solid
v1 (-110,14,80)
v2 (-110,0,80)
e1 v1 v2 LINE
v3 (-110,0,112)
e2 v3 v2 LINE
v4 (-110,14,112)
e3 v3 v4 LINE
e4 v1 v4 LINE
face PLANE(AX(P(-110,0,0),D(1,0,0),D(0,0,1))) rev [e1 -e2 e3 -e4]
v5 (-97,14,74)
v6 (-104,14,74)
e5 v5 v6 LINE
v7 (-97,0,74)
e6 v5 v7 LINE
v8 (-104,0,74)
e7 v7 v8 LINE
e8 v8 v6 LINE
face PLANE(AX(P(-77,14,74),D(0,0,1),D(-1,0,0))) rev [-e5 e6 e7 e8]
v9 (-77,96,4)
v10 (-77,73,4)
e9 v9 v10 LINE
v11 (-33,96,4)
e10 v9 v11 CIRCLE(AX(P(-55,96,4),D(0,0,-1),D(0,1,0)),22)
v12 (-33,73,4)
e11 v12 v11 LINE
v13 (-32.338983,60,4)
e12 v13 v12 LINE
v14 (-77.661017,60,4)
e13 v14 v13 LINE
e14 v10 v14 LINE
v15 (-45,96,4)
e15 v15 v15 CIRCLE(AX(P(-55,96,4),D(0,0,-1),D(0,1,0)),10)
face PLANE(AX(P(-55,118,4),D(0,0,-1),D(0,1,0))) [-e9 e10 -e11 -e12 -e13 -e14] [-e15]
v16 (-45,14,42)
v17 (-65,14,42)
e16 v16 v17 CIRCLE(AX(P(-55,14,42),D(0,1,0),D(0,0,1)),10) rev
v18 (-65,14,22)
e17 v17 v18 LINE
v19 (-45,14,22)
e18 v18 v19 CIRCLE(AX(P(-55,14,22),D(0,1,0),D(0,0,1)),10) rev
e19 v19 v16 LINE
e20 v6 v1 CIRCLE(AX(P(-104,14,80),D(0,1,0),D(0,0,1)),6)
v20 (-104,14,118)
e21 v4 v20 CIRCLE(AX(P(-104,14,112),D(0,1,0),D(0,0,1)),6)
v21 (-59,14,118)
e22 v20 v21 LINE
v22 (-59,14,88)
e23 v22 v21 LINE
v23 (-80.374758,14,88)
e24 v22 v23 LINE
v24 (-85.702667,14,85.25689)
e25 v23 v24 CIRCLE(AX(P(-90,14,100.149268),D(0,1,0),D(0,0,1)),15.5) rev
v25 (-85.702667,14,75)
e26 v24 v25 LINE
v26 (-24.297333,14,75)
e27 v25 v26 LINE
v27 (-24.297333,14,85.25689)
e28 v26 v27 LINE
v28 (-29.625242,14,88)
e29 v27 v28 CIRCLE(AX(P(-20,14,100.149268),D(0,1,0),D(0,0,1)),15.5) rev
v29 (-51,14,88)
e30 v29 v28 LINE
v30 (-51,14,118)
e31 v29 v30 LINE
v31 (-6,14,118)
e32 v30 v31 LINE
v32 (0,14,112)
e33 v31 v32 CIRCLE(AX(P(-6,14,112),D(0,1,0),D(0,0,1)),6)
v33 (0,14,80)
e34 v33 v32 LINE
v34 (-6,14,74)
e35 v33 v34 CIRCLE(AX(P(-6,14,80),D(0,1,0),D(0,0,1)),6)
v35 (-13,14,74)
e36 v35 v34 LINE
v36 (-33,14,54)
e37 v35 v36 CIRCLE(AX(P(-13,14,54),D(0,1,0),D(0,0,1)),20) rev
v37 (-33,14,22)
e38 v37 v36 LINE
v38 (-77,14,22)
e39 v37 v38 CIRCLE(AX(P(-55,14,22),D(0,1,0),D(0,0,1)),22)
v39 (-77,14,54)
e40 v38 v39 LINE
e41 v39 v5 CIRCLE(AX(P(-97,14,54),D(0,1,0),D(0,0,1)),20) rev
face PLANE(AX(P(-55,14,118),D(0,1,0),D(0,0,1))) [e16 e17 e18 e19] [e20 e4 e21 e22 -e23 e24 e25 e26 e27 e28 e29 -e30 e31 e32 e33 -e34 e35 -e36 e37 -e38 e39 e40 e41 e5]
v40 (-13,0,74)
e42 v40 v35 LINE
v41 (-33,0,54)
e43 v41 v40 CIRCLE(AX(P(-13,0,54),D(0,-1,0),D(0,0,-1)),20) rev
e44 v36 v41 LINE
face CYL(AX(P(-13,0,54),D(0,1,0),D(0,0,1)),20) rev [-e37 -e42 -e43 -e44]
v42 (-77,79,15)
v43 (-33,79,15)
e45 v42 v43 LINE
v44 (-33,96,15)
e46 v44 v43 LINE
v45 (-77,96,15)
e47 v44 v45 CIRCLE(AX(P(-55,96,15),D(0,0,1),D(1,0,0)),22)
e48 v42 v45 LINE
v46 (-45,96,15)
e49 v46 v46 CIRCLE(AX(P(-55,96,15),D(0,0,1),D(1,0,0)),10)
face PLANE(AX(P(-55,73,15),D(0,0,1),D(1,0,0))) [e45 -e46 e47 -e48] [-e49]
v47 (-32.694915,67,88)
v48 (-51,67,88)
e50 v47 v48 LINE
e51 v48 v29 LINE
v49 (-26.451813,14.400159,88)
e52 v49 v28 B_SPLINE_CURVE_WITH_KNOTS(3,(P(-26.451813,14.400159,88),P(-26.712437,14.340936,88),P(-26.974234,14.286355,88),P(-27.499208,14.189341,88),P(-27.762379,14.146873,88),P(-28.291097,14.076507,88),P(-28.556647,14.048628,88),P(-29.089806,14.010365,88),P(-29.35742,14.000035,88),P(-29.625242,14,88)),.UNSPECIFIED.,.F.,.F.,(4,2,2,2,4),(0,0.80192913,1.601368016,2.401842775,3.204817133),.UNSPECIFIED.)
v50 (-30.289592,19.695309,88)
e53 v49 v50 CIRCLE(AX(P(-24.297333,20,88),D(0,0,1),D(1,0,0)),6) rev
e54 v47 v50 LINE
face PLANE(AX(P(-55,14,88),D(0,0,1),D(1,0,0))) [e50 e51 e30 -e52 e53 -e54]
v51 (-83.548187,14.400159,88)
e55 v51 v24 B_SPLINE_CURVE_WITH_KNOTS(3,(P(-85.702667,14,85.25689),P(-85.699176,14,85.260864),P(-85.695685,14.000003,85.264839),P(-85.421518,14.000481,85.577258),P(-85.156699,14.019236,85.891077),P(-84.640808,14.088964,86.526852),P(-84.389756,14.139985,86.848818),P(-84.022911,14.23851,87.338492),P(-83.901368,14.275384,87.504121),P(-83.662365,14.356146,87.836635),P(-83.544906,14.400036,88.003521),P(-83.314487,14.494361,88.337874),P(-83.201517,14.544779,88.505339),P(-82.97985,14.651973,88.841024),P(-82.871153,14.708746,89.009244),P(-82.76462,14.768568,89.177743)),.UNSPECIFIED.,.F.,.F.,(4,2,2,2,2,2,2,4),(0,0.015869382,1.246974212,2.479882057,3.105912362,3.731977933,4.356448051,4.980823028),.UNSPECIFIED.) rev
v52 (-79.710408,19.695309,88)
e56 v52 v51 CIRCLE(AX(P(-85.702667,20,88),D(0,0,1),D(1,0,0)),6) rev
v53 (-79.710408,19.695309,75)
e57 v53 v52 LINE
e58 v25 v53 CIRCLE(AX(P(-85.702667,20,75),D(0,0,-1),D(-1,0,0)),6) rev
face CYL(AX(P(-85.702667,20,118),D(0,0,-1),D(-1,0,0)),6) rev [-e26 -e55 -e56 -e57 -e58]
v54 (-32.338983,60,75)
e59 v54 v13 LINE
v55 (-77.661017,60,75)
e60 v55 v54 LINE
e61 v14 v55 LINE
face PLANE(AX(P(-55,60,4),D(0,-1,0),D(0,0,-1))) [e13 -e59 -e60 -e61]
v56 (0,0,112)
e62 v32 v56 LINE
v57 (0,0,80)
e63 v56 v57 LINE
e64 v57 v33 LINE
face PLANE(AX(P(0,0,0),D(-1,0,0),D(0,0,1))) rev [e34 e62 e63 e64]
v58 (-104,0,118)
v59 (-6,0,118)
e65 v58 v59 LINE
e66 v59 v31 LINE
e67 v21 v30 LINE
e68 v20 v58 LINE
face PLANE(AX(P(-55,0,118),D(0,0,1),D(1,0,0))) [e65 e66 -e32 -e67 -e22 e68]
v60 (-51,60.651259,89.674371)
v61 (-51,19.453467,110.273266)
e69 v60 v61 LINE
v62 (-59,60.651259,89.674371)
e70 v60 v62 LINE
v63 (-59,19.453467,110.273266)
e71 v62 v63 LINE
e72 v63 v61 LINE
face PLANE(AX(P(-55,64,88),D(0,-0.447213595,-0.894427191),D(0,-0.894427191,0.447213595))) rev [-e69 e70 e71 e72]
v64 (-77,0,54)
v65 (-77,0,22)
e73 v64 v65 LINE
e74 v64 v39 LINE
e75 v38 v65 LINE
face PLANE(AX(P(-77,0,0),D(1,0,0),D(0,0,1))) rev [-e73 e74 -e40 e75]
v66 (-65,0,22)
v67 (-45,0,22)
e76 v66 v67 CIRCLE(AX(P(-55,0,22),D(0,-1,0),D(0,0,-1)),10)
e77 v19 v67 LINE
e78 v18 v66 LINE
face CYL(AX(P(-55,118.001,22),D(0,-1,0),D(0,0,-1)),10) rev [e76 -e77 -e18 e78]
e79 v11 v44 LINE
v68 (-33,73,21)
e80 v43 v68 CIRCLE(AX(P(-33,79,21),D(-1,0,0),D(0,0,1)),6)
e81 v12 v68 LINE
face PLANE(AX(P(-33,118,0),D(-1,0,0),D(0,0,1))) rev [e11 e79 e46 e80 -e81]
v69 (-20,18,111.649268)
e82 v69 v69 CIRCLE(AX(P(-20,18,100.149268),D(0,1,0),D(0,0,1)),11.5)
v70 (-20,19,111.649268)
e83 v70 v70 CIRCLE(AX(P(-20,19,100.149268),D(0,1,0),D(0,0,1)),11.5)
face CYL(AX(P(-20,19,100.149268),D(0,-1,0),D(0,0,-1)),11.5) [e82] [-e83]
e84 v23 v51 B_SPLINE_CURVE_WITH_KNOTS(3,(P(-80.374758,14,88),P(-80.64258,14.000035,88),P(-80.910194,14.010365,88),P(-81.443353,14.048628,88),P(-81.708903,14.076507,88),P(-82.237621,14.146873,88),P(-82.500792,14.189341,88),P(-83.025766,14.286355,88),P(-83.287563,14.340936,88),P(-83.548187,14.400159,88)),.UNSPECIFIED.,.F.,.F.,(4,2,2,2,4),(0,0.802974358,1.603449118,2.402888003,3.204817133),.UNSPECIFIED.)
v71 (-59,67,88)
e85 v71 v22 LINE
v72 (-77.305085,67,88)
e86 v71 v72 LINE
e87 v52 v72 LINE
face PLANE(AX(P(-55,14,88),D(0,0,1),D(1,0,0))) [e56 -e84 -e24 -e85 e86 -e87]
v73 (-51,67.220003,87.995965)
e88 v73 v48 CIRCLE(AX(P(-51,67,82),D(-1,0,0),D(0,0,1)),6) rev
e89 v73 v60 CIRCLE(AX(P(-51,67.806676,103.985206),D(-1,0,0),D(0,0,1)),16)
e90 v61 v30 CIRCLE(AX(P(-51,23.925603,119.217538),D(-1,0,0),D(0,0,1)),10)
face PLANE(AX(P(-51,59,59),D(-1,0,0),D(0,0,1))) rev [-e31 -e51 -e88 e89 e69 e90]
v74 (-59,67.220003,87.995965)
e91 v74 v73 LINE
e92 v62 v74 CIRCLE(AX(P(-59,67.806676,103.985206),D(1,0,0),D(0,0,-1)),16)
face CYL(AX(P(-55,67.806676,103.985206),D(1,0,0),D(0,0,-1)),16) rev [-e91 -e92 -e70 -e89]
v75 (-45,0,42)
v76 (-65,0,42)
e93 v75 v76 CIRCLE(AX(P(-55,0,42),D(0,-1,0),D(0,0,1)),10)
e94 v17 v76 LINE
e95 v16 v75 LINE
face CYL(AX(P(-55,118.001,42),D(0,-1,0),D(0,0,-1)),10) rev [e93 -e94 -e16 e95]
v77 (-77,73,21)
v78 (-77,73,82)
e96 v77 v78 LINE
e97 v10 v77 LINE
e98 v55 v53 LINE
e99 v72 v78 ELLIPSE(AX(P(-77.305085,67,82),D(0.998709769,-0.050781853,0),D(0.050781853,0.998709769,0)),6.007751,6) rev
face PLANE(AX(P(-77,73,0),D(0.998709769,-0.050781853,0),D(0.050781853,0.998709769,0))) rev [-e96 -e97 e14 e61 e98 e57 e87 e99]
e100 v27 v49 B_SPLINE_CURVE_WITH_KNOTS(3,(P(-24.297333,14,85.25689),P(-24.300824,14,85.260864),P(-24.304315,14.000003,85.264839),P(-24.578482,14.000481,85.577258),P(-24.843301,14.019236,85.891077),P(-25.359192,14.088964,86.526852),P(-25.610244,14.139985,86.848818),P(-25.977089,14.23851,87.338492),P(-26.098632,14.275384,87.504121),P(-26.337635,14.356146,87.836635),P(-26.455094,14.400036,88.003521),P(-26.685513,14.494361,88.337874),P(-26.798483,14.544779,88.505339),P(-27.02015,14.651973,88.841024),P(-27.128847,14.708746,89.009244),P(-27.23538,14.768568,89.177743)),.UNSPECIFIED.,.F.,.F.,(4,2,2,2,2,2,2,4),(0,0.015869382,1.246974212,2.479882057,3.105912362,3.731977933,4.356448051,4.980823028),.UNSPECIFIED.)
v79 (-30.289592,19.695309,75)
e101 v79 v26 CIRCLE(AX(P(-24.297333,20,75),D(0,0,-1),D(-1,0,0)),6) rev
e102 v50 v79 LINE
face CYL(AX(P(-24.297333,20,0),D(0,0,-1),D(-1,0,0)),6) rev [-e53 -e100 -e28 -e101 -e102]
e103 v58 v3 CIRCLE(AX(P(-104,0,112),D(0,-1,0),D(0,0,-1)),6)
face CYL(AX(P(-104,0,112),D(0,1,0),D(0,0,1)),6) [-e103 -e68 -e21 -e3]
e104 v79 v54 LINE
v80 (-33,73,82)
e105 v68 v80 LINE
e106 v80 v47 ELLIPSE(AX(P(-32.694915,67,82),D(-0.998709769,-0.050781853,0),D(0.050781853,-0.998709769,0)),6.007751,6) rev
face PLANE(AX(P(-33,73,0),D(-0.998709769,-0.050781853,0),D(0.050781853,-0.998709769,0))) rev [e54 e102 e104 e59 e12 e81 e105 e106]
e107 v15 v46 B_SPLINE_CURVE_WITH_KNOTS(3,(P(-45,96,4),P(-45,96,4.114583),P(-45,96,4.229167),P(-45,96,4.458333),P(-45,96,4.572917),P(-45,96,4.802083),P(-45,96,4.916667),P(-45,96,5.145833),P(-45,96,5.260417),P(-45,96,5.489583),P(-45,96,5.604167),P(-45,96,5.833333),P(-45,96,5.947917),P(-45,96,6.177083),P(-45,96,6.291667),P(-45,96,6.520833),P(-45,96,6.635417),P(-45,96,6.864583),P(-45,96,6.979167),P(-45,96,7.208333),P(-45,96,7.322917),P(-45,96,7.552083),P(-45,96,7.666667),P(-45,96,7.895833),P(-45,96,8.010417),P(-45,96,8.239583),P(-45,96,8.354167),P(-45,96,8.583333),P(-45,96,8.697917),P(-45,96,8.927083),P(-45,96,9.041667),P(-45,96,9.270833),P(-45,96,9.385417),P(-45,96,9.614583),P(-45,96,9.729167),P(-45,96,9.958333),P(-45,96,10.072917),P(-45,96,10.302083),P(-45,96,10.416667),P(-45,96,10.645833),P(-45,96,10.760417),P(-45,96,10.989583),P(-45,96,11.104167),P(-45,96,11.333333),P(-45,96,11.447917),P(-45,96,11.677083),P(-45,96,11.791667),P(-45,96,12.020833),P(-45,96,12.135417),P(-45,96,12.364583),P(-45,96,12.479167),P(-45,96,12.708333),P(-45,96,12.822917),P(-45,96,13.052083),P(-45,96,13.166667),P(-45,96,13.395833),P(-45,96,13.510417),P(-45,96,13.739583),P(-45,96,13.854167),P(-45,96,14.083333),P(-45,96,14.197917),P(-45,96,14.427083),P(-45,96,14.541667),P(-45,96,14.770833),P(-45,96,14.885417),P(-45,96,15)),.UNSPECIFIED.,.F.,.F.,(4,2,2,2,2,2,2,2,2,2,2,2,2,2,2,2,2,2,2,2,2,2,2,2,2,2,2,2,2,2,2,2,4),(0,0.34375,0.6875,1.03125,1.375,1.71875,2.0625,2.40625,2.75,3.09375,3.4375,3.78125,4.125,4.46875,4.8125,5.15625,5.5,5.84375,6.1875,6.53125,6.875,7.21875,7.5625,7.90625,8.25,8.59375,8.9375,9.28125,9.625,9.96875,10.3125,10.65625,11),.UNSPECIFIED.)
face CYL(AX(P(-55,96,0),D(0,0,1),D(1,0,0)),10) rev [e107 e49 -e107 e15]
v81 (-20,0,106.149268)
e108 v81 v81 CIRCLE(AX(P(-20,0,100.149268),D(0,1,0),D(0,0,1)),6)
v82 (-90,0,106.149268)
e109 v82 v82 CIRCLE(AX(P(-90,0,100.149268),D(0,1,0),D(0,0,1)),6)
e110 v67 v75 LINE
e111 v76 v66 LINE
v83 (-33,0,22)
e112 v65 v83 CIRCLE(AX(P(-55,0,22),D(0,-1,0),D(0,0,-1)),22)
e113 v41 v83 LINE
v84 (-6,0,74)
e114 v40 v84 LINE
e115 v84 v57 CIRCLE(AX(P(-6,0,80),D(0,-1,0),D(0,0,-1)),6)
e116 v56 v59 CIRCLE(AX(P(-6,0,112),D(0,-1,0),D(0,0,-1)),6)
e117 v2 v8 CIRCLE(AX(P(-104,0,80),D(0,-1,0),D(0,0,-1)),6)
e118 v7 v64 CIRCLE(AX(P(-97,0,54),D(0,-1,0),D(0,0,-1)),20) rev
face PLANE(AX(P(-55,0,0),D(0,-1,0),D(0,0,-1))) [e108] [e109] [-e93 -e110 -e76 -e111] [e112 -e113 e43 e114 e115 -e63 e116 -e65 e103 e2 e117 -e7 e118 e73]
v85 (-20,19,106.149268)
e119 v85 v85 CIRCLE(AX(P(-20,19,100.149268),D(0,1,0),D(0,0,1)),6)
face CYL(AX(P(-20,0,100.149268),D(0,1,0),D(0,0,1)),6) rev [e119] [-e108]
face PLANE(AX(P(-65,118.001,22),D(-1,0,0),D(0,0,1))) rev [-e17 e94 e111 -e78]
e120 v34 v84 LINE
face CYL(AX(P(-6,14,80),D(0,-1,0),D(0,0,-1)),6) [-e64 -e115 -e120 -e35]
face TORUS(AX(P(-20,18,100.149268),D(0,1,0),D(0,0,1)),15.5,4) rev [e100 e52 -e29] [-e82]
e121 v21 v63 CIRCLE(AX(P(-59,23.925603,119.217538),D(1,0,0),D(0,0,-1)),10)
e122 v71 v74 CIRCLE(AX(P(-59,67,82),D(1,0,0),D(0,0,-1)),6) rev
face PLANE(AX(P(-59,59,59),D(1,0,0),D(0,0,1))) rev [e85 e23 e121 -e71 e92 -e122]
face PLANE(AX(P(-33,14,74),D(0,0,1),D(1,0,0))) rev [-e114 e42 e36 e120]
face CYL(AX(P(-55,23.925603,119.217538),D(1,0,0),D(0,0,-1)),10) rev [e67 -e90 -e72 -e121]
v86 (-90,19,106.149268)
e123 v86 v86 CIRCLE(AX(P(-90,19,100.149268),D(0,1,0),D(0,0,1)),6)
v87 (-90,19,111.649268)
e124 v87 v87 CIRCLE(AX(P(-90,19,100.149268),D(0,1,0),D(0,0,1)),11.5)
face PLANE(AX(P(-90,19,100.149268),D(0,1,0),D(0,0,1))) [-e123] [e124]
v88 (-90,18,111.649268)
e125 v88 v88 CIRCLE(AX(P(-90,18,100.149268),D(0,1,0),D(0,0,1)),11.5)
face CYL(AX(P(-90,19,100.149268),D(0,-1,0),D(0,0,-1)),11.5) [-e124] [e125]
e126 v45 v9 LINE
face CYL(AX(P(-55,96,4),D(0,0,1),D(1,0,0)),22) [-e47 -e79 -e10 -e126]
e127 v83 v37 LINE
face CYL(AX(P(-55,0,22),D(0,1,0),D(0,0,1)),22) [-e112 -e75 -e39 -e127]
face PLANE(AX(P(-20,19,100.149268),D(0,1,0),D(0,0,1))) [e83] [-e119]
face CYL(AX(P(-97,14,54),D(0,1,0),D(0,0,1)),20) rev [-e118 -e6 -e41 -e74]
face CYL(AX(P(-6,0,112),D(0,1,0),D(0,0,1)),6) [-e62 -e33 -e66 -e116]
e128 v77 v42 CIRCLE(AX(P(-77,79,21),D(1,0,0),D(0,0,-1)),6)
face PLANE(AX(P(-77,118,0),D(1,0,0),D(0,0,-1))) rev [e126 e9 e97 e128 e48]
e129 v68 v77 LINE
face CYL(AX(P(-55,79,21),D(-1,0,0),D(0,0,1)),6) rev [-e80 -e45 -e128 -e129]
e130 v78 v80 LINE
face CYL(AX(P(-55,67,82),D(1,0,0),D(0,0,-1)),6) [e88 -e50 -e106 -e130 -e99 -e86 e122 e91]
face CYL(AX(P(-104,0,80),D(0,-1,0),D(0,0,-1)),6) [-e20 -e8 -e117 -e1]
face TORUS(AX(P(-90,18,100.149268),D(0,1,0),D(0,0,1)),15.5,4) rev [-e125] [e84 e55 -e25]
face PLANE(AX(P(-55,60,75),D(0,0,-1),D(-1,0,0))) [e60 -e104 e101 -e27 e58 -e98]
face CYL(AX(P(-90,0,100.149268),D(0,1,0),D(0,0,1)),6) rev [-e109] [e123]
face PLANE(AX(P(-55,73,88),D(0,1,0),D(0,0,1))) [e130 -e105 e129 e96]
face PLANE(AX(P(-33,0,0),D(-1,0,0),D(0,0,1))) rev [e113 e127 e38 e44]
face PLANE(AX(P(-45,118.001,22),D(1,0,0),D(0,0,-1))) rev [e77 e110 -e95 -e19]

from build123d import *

# Parameters (mm, degrees)
ESTRUSIONE_ESTRUSIONE2_DEPTH = 55
NERVATURA1_REACH             = 177.707
SCHIZZO2_WALL_W              = 409.315984862
SCHIZZO2_WALL_H              = 4
SCHIZZO3_W                   = 84
SCHIZZO3_H                   = 104
TAGLIO_ESTRUSIONE1_DEPTH     = 30
SCHIZZO4_W                   = 74
SCHIZZO4_H                   = 14
TAGLIO_ESTRUSIONE2_DEPTH     = 33
SPECCHIA2_START              = -77
SPECCHIA2_DEPTH              = 22
SPECCHIA2_START_2            = -110
SPECCHIA2_2_OUTLINE_W        = 14
SPECCHIA2_2_OUTLINE_H        = 44
SPECCHIA2_2_DEPTH            = 33
SPECCHIA2_START_3            = -80
SPECCHIA2_3_DEPTH            = 3
SPECCHIA2_START_4            = -59
SPECCHIA2_4_DEPTH            = 4
RACCORDO1_RADIUS             = 22
RACCORDO1_LENGTH             = 14
RACCORDO3_R                  = 20
RACCORDO4_R                  = 6
TAGLIO_ESTRUSIONE3_DEPTH     = 184.760713973
SCHIZZO7_W                   = 3
SCHIZZO7_H                   = 45
TAGLIO_ESTRUSIONE4_DEPTH     = 192.397492147
RACCORDO11_RADIUS            = 22
RACCORDO11_LENGTH            = 11
RACCORDO12_R                 = 6
RACCORDO13_R                 = 16
RACCORDO15_R                 = 10
SCHIZZO8_R                   = 10
TAGLIO_ESTRUSIONE5_DEPTH     = 192.397492147
SCHIZZO9_R                   = 11.5
ESTRUSIONE_ESTRUSIONE3_DEPTH = 5
SCHIZZO10_R                  = 6
TAGLIO_ESTRUSIONE6_DEPTH     = 190.274932307
TAGLIO_ESTRUSIONE7_REACH     = 201.87
RACCORDO17_R                 = 4
RACCORDO18_START             = 75
RACCORDO18_DEPTH             = 13


with BuildPart() as part:
    # Schizzo1 → Estrusione-Estrusione2 (new body)
    with BuildSketch(Plane(origin=(0, 0, 0), x_dir=(0, 0, -1), z_dir=(1, 0, 0))):
        Polygon((0, 0), (-118, 0), (-118, 14), (-88, 14), (-88, 73), (-15, 73), (-15, 118), (-4, 118), (-4, 60), (-75, 60), (-75, 14), (0, 14), align=None)
    extrude(amount=-ESTRUSIONE_ESTRUSIONE2_DEPTH)

    # Schizzo2 wall → Nervatura1 (add, up to next)
    with BuildSketch(Plane(origin=(-55, 39, 100.5), x_dir=(0, -0.894427191, 0.4472135955), z_dir=(0, 0.4472135955, 0.894427191)), mode=Mode.PRIVATE) as nervatura1_sk1:
        with Locations((0, 2)):
            Rectangle(SCHIZZO2_WALL_W, SCHIZZO2_WALL_H)
    nervatura1_tool1 = extrude(nervatura1_sk1.sketch, amount=-NERVATURA1_REACH, mode=Mode.PRIVATE) - part.part
    add(nervatura1_tool1.solids().sort_by_distance((-55, 39, 100.5))[0])

    # Schizzo3 → Taglio-Estrusione1 (cut)
    with BuildSketch(Plane(origin=(0, 0, 0), x_dir=(0, 0, -1), z_dir=(1, 0, 0))):
        with Locations((-46, 66)):
            Rectangle(SCHIZZO3_W, SCHIZZO3_H)
    extrude(amount=-TAGLIO_ESTRUSIONE1_DEPTH, mode=Mode.SUBTRACT)

    # Schizzo4 → Taglio-Estrusione2 (cut)
    with BuildSketch(Plane(origin=(0, 0, 0), x_dir=(0, 0, -1), z_dir=(1, 0, 0))):
        with Locations((-37, 7)):
            Rectangle(SCHIZZO4_W, SCHIZZO4_H)
    extrude(amount=-TAGLIO_ESTRUSIONE2_DEPTH, mode=Mode.SUBTRACT)

    # Specchia2: read off the stored shape, not the designer's step
    # Specchia2 outline → Specchia2 (add)
    with BuildSketch(Plane.YZ.offset(SPECCHIA2_START)):
        Polygon((0, 0), (14, 0), (14, 75), (60, 75), (60, 4), (118, 4), (118, 15), (73, 15), (73, 88), (14, 88), (14, 118), (0, 118), align=None)
    extrude(amount=SPECCHIA2_DEPTH)

    # Specchia2 2 outline → Specchia2 2 (add)
    with BuildSketch(Plane.YZ.offset(SPECCHIA2_START_2)):
        with Locations((7, 96)):
            Rectangle(SPECCHIA2_2_OUTLINE_W, SPECCHIA2_2_OUTLINE_H)
    extrude(amount=SPECCHIA2_2_DEPTH)

    # Specchia2 3 outline → Specchia2 3 (add)
    with BuildSketch(Plane.YZ.offset(SPECCHIA2_START_3)):
        Polygon((14, 88), (14, 75), (60, 75), (60, 4), (118, 4), (118, 15), (73, 15), (73, 88), align=None)
    extrude(amount=SPECCHIA2_3_DEPTH)

    # Specchia2 4 outline → Specchia2 4 (add)
    with BuildSketch(Plane.YZ.offset(SPECCHIA2_START_4)):
        Polygon((14, 113), (14, 88), (64, 88), align=None)
    extrude(amount=SPECCHIA2_4_DEPTH)

    # Raccordo1: full round fillet: the end face becomes a half cylinder, R = half its width
    raccordo1_face = Plane((-55, 7, 0), x_dir=(0, -1, 0), z_dir=(0, 0, -1))  # on the end face: x along it, z out of the body
    raccordo1_slab = raccordo1_face.offset(-RACCORDO1_RADIUS / 2) * Box(RACCORDO1_LENGTH, 2 * RACCORDO1_RADIUS, RACCORDO1_RADIUS, mode=Mode.PRIVATE)  # the body's end, R deep
    raccordo1_round = Plane((-55, 7, 22), x_dir=(0, 0, -1), z_dir=(0, -1, 0)) * Cylinder(RACCORDO1_RADIUS, RACCORDO1_LENGTH, mode=Mode.PRIVATE)  # its axis R under the face
    add(raccordo1_slab - raccordo1_round, mode=Mode.SUBTRACT)

    # Raccordo3
    raccordo3_edges = [part.edges().sort_by_distance(p)[0] for p in [
        (-33, 7, 74),
        (-77, 7, 74),
    ]]
    fillet(raccordo3_edges, radius=RACCORDO3_R)

    # Raccordo4
    raccordo4_edges = [part.edges().sort_by_distance(p)[0] for p in [
        (0, 7, 74),
        (-110, 7, 118),
        (0, 7, 118),
        (-110, 7, 74),
    ]]
    fillet(raccordo4_edges, radius=RACCORDO4_R)

    # Schizzo6 → Taglio-Estrusione3 (cut, through all)
    with BuildSketch(Plane.XY.offset(88)):
        Polygon((-33, 73), (-30, 14), (-30, 73), align=None)
        Polygon((-80, 14), (-80, 73), (-77, 73), align=None)
    extrude(amount=-TAGLIO_ESTRUSIONE3_DEPTH, mode=Mode.SUBTRACT)

    # Schizzo7 → Taglio-Estrusione4 (cut, through all)
    with BuildSketch(Plane.XY.offset(15)):
        with Locations((-31.5, 95.5)):
            Rectangle(SCHIZZO7_W, SCHIZZO7_H)
        with Locations((-78.5, 95.5)):
            Rectangle(SCHIZZO7_W, SCHIZZO7_H)
    extrude(amount=-TAGLIO_ESTRUSIONE4_DEPTH, mode=Mode.SUBTRACT)

    # Raccordo11: full round fillet: the end face becomes a half cylinder, R = half its width
    raccordo11_face = Plane((-55, 118, 9.5), x_dir=(0, 0, -1), z_dir=(0, 1, 0))  # on the end face: x along it, z out of the body
    raccordo11_slab = raccordo11_face.offset(-RACCORDO11_RADIUS / 2) * Box(RACCORDO11_LENGTH, 2 * RACCORDO11_RADIUS, RACCORDO11_RADIUS, mode=Mode.PRIVATE)  # the body's end, R deep
    raccordo11_round = Plane((-55, 96, 9.5), x_dir=(0, 1, 0), z_dir=(0, 0, -1)) * Cylinder(RACCORDO11_RADIUS, RACCORDO11_LENGTH, mode=Mode.PRIVATE)  # its axis R under the face
    add(raccordo11_slab - raccordo11_round, mode=Mode.SUBTRACT)

    # Raccordo12
    raccordo12_edges = [part.edges().sort_by_distance(p)[0] for p in [
        (-55, 73, 15),
        (-55, 73, 88),
    ]]
    fillet(raccordo12_edges, radius=RACCORDO12_R)

    # Raccordo13
    # the kernel refuses this fillet: 16 mm, written as the material it adds along each edge
    with BuildSketch(Plane(origin=(-59, 64, 88), x_dir=(7.107647619401389e-15, 0.9999992149494827, -0.0012530364791798036), z_dir=(1, 0, 0))) as raccordo13_piece_1:
        with BuildLine():
            CenterArc((3.78664302, 15.989963147), RACCORDO13_R, 243.506742544, 24.463710432)
            Line((-3.350836892, 1.670173327), (-4.064584883, 0.238194345))
            Line((-4.064584883, 0.238194345), (-0.713747991, -1.431978982))
            Line((-0.713747991, -1.431978982), (0.002004858, -1.599998744))
            ThreePointArc((0.002004858, -1.599998744), (3.002002503, -1.596239634), (3.163341295, -1.598996315))
            Line((3.163341295, -1.598996315), (3.220005088, 0))
        make_face()
    extrude(amount=8)

    # Raccordo15
    # the kernel refuses this fillet: 10 mm, written as the material it adds along each edge
    with BuildSketch(Plane(origin=(-51, 14, 113), x_dir=(0, 0, 1), z_dir=(-1, 0, 0))) as raccordo15_piece_1:
        with BuildLine():
            CenterArc((6.217538244, 9.925603288), RACCORDO15_R, 206.565051177, 56.441617235)
            Line((-2.726733666, 5.453467333), (-2.905619105, 5.364024614))
            Line((-2.905619105, 5.364024614), (-0.178885438, -0.089442719))
            Line((-0.178885438, -0.089442719), (0, -0.2))
            ThreePointArc((0, -0.2), (2.5, -0.2), (4.975649235, -0.198512066))
            Line((4.975649235, -0.198512066), (5, 0))
        make_face()
    extrude(amount=8)

    # Schizzo8 → Taglio-Estrusione5 (cut, through all)
    with BuildSketch(Plane.XY.offset(15)):
        with Locations((-55, 96)):
            Circle(SCHIZZO8_R)
    extrude(amount=-TAGLIO_ESTRUSIONE5_DEPTH, mode=Mode.SUBTRACT)

    # Schizzo9 → Estrusione-Estrusione3 (add)
    with BuildSketch(Plane(origin=(0, 14, 0), x_dir=(1, 0, 0), z_dir=(0, 1, 0))):
        with Locations(Location((-90, -100.149267902, 0), (0, 0, 270))):
            Circle(SCHIZZO9_R)
        with Locations(Location((-20, -100.149267902, 0), (0, 0, 270))):
            Circle(SCHIZZO9_R)
    extrude(amount=ESTRUSIONE_ESTRUSIONE3_DEPTH)

    # Schizzo10 → Taglio-Estrusione6 (cut, through all)
    with BuildSketch(Plane(origin=(0, 19, 0), x_dir=(1, 0, 0), z_dir=(0, 1, 0))):
        with Locations(Location((-90, -100.149267902, 0), (0, 0, 270))):
            Circle(SCHIZZO10_R)
        with Locations(Location((-20, -100.149267902, 0), (0, 0, 270))):
            Circle(SCHIZZO10_R)
    extrude(amount=-TAGLIO_ESTRUSIONE6_DEPTH, mode=Mode.SUBTRACT)

    # Schizzo11 → Taglio-Estrusione7 (cut, up to next)
    with BuildSketch(Plane.XZ, mode=Mode.PRIVATE) as taglio_estrusione7_sk1:
        with BuildLine():
            Line((-65, 22), (-65, 42))
            ThreePointArc((-65, 42), (-55, 52), (-45, 42))
            Line((-45, 42), (-45, 22))
            ThreePointArc((-45, 22), (-55, 12), (-65, 22))
        make_face()
    taglio_estrusione7_tool1 = extrude(taglio_estrusione7_sk1.sketch, amount=-TAGLIO_ESTRUSIONE7_REACH, mode=Mode.PRIVATE) & part.part
    add(taglio_estrusione7_tool1.solids().sort_by_distance((-55, 0, 32))[0], mode=Mode.SUBTRACT)

    # Raccordo17
    raccordo17_edges = [part.edges().sort_by_distance(p)[0] for p in [
        (-90, 14, 88.649267902),
        (-20, 14, 88.649267902),
    ]]
    fillet(raccordo17_edges, radius=RACCORDO17_R)

    # Raccordo18: read off the stored shape, not the designer's step
    # Raccordo18 outline → Raccordo18 (add)
    with BuildSketch(Plane.XY.offset(RACCORDO18_START)):
        with BuildLine():
            Line((-80, 14), (-79.710408023, 19.695308884))
            ThreePointArc((-79.710408023, 19.695308884), (-81.56915401, 15.650968689), (-85.702666639, 14))
            Line((-85.702666639, 14), (-80, 14))
        make_face()
        with BuildLine():
            Line((-30.289591977, 19.695308884), (-30, 14))
            Line((-30, 14), (-24.297333361, 14))
            ThreePointArc((-24.297333361, 14), (-28.43084599, 15.650968689), (-30.289591977, 19.695308884))
        make_face()
    extrude(amount=RACCORDO18_DEPTH)


solid = part.part
